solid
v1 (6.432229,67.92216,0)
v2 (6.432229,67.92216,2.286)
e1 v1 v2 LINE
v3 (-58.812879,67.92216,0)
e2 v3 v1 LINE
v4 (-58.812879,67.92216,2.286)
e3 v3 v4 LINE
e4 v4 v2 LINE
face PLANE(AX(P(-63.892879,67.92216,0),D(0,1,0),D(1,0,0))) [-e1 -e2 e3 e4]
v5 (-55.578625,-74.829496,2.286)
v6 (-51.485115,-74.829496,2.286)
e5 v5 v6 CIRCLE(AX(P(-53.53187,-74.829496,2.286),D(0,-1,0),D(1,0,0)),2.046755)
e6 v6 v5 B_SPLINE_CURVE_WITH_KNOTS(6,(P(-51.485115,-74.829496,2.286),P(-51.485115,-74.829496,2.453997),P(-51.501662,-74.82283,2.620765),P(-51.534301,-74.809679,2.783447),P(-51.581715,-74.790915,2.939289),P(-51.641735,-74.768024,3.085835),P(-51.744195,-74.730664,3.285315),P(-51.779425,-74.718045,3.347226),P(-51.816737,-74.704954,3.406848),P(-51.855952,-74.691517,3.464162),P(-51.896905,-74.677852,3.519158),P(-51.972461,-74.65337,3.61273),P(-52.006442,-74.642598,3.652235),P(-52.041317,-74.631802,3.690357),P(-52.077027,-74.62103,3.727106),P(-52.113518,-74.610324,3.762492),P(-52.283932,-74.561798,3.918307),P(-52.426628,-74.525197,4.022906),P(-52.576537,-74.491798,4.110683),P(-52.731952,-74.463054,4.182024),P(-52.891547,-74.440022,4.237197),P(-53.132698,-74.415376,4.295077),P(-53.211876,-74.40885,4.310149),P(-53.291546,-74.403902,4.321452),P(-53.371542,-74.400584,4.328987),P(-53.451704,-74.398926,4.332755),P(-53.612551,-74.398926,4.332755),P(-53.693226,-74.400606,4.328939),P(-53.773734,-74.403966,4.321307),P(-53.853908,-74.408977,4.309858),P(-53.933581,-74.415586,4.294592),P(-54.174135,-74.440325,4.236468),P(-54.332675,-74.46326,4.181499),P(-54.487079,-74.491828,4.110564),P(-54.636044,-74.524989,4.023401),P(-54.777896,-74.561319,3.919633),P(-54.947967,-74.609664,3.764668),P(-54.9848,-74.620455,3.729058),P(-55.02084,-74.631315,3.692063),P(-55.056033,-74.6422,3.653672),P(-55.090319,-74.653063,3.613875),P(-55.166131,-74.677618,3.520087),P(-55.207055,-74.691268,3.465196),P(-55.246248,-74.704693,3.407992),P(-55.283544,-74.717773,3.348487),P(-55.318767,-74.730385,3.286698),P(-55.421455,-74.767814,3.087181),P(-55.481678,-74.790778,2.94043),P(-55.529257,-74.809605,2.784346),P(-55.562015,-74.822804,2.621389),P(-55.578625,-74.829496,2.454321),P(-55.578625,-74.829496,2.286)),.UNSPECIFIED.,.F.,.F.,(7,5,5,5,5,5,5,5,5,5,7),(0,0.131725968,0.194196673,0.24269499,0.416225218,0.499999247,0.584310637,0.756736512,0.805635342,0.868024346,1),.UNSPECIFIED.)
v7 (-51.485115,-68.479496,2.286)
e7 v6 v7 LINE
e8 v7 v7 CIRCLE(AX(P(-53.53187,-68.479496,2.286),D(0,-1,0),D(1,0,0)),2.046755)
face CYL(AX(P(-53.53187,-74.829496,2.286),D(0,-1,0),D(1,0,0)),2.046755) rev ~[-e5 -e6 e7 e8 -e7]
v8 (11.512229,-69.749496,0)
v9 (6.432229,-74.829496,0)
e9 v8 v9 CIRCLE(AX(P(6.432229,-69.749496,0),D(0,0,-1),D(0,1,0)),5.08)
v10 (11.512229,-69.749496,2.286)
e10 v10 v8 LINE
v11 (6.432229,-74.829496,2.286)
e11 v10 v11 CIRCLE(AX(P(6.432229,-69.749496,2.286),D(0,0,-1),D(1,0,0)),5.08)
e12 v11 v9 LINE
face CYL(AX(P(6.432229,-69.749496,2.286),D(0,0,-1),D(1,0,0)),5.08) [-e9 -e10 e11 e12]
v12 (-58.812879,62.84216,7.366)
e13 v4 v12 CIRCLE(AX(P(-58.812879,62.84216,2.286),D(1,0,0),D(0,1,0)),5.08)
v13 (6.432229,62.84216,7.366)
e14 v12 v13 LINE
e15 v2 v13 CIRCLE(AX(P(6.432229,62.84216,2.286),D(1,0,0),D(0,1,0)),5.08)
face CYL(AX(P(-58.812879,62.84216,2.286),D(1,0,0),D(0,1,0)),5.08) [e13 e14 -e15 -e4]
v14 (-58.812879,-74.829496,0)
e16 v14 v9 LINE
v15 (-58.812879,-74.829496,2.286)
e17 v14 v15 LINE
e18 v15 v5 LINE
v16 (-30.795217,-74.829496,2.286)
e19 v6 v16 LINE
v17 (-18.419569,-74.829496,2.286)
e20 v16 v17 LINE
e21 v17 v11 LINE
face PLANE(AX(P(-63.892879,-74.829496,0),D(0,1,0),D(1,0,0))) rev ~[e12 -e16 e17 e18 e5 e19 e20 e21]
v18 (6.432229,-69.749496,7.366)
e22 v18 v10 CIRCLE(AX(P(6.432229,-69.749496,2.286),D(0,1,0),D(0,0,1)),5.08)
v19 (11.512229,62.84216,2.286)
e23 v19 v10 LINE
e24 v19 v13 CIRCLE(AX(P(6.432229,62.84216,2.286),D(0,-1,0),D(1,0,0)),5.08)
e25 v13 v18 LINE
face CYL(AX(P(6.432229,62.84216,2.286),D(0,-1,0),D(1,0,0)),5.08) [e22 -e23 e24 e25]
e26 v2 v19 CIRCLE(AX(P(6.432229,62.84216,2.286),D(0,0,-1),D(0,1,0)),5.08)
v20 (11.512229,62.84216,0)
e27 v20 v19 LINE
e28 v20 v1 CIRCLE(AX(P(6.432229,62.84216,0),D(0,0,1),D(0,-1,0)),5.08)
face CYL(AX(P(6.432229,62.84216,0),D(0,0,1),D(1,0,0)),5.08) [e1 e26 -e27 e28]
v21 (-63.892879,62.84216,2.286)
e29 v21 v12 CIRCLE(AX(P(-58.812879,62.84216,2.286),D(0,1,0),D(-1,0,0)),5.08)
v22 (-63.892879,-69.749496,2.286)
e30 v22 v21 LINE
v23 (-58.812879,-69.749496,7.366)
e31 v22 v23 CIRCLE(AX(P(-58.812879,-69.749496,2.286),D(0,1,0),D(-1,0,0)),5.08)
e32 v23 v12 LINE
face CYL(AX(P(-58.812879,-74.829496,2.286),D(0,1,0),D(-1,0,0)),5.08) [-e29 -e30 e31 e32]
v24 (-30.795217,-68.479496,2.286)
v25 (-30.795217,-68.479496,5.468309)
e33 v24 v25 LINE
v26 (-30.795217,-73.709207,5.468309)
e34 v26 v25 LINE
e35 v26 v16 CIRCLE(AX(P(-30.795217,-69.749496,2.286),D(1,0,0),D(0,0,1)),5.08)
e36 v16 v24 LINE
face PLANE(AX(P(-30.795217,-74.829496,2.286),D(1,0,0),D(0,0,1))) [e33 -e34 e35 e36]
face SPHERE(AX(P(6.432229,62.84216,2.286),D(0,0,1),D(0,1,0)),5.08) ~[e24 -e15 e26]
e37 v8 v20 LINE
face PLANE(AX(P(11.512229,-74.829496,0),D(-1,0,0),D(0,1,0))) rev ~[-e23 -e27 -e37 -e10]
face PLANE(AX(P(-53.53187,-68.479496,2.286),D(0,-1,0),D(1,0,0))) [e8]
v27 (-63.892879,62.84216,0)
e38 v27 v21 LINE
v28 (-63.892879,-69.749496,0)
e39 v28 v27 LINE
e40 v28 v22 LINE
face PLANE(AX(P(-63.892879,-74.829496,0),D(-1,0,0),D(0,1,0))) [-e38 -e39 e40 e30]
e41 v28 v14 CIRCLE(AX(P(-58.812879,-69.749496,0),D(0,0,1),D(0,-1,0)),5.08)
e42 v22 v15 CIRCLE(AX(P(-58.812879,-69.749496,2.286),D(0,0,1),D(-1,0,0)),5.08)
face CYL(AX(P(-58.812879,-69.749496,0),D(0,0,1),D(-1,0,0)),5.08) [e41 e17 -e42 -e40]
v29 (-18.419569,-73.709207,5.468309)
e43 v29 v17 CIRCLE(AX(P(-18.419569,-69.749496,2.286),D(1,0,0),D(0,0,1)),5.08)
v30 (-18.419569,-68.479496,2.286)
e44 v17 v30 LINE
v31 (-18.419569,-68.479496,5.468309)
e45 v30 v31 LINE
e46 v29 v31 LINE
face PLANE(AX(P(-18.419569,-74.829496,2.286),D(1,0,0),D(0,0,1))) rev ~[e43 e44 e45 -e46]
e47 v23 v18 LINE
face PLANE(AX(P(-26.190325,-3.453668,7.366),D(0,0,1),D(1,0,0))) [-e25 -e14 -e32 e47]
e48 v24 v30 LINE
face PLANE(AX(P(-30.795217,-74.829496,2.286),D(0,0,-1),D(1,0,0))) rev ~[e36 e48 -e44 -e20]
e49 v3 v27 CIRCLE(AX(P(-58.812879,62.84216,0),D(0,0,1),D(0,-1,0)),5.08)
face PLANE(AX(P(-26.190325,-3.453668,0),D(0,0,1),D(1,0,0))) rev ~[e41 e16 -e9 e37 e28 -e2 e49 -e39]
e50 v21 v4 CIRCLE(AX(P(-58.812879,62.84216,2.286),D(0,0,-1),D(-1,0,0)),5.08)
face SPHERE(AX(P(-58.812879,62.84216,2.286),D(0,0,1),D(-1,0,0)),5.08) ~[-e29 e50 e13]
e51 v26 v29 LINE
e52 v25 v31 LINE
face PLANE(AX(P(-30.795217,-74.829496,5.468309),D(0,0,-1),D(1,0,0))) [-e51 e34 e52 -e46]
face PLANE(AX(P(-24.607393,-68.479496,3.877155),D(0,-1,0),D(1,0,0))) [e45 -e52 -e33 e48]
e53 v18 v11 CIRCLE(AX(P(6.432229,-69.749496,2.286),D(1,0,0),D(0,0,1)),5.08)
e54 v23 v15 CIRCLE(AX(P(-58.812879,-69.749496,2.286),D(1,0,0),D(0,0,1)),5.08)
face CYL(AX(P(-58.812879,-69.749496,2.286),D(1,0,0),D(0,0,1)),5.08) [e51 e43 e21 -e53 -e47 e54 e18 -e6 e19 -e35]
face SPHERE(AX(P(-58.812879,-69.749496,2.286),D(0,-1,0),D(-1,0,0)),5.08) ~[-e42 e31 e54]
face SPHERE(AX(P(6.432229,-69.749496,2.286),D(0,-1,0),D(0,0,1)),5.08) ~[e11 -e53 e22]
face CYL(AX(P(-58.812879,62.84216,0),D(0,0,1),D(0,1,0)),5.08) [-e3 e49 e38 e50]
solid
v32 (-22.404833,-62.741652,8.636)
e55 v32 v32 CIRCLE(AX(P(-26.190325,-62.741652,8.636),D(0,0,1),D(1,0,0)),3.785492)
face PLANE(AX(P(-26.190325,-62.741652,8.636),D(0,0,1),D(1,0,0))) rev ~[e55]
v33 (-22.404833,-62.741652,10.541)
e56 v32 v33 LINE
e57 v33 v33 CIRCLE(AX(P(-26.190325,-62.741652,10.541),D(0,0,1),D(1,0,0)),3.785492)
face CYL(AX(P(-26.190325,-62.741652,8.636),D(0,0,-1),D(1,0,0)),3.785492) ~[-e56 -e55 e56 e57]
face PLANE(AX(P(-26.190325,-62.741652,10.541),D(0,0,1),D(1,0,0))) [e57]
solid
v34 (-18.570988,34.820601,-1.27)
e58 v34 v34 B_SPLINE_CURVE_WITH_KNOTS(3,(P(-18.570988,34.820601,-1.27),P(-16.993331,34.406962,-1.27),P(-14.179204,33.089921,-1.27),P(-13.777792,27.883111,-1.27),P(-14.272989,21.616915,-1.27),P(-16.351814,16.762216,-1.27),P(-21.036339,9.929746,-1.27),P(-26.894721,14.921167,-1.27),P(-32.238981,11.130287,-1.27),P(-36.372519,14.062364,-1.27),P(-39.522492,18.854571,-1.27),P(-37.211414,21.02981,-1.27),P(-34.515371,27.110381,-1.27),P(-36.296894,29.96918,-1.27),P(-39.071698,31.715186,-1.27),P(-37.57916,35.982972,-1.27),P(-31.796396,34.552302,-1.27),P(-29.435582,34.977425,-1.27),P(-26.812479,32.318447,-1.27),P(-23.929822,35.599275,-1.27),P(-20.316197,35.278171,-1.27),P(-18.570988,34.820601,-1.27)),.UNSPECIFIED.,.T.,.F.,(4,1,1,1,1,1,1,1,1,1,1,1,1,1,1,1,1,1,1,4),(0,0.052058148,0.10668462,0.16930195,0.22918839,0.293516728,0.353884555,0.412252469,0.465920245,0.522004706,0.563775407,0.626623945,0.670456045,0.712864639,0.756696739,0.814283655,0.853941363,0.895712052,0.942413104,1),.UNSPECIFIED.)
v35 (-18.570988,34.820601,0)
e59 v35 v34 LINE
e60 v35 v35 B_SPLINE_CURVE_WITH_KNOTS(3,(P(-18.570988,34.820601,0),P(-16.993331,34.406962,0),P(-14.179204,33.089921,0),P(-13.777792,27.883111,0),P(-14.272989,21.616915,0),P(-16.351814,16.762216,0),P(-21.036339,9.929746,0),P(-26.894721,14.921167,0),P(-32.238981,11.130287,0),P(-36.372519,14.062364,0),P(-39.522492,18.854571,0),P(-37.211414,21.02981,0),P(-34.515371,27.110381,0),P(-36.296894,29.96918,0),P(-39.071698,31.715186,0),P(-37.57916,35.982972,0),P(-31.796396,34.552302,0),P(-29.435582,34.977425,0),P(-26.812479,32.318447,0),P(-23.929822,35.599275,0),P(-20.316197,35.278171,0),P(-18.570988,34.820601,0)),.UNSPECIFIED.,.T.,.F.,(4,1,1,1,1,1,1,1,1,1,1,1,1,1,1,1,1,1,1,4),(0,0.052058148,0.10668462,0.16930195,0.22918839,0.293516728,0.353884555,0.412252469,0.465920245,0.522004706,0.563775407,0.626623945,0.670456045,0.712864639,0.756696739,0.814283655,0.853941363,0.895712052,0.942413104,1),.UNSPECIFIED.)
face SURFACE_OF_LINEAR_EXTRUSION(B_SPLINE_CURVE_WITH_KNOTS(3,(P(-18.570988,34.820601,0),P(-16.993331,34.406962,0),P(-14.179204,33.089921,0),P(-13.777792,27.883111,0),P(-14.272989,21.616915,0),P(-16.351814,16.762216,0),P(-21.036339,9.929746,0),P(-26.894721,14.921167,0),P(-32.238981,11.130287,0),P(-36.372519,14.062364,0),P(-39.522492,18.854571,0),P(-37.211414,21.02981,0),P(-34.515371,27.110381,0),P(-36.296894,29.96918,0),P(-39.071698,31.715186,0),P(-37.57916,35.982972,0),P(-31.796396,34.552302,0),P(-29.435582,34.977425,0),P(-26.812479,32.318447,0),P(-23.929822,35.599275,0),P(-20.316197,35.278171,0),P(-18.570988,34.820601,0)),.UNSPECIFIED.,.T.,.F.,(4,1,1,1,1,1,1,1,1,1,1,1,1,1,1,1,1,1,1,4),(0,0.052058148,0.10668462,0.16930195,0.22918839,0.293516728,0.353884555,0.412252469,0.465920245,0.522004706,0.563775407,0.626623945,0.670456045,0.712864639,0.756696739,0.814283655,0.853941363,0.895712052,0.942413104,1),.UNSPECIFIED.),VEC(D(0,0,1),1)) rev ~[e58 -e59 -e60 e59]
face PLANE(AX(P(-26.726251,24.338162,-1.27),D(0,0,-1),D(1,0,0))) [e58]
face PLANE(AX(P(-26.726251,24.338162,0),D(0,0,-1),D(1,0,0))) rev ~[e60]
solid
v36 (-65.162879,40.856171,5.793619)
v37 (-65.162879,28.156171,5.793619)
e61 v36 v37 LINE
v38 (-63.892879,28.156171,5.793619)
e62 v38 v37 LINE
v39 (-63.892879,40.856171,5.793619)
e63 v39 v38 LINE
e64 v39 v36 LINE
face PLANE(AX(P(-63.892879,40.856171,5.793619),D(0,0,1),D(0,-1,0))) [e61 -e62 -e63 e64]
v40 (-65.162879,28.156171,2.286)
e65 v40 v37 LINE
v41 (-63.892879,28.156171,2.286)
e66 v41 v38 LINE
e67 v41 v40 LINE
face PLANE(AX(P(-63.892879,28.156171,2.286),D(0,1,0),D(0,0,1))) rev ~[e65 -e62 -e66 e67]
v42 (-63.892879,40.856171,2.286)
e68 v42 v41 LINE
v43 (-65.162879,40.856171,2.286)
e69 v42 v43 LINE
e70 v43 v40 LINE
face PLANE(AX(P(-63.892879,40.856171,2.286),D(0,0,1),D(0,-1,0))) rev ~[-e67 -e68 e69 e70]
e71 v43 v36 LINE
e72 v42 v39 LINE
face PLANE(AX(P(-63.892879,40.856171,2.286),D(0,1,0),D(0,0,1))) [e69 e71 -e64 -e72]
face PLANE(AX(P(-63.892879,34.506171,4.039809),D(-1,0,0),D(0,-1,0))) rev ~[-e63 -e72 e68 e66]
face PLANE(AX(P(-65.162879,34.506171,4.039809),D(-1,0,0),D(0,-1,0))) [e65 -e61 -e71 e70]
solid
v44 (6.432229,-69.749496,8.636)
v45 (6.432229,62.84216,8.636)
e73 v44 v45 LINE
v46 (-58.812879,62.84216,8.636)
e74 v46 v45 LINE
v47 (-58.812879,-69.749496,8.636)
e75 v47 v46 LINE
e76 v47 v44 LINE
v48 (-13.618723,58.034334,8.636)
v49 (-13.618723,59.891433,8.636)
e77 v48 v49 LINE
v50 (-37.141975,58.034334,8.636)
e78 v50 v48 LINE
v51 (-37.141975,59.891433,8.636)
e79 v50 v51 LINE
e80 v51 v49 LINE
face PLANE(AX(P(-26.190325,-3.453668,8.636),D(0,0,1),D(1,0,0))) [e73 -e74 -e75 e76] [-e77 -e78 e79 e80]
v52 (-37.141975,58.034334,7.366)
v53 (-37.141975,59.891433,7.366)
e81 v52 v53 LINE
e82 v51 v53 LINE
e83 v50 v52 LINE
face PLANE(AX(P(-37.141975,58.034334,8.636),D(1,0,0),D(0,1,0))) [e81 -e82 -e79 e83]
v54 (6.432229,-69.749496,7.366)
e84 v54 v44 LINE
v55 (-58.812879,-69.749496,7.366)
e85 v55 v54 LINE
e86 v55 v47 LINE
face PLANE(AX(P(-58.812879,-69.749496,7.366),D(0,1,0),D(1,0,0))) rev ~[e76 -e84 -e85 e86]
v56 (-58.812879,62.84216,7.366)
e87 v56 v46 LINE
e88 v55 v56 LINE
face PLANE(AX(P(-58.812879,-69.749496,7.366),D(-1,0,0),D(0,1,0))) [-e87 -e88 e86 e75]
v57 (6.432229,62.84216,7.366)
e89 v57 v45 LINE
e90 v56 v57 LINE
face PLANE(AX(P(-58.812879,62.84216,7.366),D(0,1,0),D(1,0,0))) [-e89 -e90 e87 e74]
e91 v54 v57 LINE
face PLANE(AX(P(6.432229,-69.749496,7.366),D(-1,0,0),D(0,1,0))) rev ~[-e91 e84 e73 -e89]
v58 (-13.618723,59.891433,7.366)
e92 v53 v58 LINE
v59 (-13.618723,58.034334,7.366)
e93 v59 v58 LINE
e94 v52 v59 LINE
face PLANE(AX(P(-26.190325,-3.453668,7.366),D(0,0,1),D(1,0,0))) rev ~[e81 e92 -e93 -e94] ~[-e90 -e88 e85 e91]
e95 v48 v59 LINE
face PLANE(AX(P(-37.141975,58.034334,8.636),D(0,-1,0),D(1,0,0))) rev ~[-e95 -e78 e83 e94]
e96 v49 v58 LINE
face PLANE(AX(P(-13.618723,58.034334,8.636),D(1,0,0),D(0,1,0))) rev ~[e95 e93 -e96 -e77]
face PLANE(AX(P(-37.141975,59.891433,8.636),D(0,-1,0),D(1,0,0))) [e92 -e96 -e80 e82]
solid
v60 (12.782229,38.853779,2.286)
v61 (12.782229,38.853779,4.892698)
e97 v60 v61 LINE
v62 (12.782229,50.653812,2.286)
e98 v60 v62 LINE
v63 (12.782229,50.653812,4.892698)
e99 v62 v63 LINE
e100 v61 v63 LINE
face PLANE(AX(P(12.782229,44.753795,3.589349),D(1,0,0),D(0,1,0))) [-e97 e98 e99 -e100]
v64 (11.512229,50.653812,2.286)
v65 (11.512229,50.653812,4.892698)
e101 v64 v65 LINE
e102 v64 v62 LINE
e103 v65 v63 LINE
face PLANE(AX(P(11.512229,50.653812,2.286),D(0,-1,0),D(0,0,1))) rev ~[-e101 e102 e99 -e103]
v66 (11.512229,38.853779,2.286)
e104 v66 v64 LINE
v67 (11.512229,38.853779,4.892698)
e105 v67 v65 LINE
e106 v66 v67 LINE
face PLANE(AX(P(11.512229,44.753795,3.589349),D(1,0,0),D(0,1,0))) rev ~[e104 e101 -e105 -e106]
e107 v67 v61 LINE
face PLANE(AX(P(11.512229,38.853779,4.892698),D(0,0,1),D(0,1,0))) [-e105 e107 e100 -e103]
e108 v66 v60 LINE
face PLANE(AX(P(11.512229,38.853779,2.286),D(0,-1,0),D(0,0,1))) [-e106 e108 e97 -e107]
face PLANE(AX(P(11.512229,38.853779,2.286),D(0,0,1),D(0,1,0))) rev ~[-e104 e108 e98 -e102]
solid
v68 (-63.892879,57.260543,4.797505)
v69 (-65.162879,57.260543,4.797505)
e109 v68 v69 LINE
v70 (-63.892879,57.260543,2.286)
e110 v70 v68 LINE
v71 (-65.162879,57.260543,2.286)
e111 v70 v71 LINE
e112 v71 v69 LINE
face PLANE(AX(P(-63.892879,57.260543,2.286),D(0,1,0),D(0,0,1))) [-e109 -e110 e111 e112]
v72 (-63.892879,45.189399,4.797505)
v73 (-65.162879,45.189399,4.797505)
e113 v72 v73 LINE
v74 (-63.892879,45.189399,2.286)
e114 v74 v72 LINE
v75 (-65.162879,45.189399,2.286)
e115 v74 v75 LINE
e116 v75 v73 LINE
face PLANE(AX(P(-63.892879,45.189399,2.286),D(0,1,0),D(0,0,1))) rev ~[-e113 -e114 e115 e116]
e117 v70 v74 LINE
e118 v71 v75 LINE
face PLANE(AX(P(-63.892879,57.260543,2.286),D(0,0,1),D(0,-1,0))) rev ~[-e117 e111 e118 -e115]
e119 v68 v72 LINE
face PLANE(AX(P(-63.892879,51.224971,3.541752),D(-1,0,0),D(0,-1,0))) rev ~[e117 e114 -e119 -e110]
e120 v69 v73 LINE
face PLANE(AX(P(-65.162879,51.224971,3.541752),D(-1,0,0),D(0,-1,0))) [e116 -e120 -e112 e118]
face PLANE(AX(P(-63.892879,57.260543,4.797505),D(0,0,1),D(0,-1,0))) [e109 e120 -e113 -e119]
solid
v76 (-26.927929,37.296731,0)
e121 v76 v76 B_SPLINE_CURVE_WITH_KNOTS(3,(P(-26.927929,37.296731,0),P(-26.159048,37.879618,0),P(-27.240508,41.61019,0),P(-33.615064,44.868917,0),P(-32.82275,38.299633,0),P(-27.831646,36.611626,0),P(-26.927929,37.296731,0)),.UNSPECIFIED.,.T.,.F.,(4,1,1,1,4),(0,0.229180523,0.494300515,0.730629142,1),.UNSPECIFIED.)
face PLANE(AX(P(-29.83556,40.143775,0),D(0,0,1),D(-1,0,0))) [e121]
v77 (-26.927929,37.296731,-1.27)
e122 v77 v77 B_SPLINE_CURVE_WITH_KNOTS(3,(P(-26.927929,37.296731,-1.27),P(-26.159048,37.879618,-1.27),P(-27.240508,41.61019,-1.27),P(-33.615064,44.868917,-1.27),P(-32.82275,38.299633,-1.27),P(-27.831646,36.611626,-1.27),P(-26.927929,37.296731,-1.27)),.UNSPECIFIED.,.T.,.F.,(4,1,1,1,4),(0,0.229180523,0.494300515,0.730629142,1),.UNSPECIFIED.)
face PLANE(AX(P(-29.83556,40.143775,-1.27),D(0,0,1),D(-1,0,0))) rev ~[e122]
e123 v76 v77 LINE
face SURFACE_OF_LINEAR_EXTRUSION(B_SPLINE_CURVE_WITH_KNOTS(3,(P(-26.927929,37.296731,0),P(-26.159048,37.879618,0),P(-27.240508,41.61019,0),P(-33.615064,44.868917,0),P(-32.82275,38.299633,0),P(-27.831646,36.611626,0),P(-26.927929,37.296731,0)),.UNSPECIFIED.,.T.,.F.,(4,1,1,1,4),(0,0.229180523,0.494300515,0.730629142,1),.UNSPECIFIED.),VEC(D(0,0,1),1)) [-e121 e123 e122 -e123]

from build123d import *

# Parameters (mm, degrees)
F0_W      = 75.4051078111
F0_H      = 142.7516564727
F1_DEPTH  = 7.366
F2_F1_R   = 5.08
F2_F2_R   = 5.08
F2_F3_R   = 5.08
F2_F4_R   = 5.08
F3_W      = 12.3756472021
F3_H      = 3.1823093913
F4_DEPTH  = 6.35
F5_R      = 2.046755254
F6_DEPTH  = 6.35
F7_W      = 65.2451078111
F7_H      = 132.5916564727
F8_DEPTH  = 1.27
F9_W      = 11.800032109
F9_H      = 2.6066980235
F10_DEPTH = 1.27
F11_R     = 3.7854916829
F12_DEPTH = 1.905
F13_W     = 23.5232524574
F13_H     = 1.857098192
F14_DEPTH = 6.35
F15_W     = 12.0711438358
F15_H     = 2.5115047491
F16_DEPTH = 1.27
F17_W     = 12.7
F17_H     = 3.5076188103
F18_DEPTH = 1.27
F20_DEPTH = 1.27


with BuildPart() as f1:
    # F0 (on Top) → F1 (new body)
    with BuildSketch(Plane.XY):
        with Locations((-26.1903246865, -3.4536682069)):
            Rectangle(F0_W, F0_H)
    extrude(amount=F1_DEPTH)

    # F2: fillet of radius 5.08 on 8 edges, made by hand

    # F2_f1
    f2_f1_edges = [f1.edges().sort_by_distance(p)[0] for p in [
        (11.5122292191, 67.9221600294, 3.683),
    ]]
    fillet(f2_f1_edges, radius=F2_F1_R)

    # F2_f2
    f2_f2_edges = [f1.edges().sort_by_distance(p)[0] for p in [
        (-63.892878592, 67.9221600294, 3.683),
    ]]
    fillet(f2_f2_edges, radius=F2_F2_R)

    # F2_f3
    f2_f3_edges = [f1.edges().sort_by_distance(p)[0] for p in [
        (-26.1903246865, 67.9221600294, 7.366),
    ]]
    fillet(f2_f3_edges, radius=F2_F3_R)

    # F2_f4
    f2_f4_edges = [f1.edges().sort_by_distance(p)[0] for p in [
        (-63.892878592, -74.8294964433, 1.143),
    ]]
    fillet(f2_f4_edges, radius=F2_F4_R)

    # F3 (on face) → F4 (cut)
    with BuildSketch(Plane.XZ.offset(74.8294964433)):
        with Locations((-24.6073929593, 3.8771546956)):
            Rectangle(F3_W, F3_H)
    extrude(amount=-F4_DEPTH, mode=Mode.SUBTRACT)

    # F5 (on face) → F6 (cut)
    with BuildSketch(Plane.XZ.offset(74.8294964433)):
        with Locations((-53.5318702459, 2.286)):
            Circle(F5_R)
    extrude(amount=-F6_DEPTH, mode=Mode.SUBTRACT)


with BuildPart() as f8:
    # F7 (on face) → F8 (new body)
    with BuildSketch(Plane.XY.offset(7.366)):
        with Locations((-26.1903246865, -3.4536682069)):
            Rectangle(F7_W, F7_H)
    extrude(amount=F8_DEPTH)

    # F13 (on face) → F14 (cut)
    with BuildSketch(Plane.XY.offset(8.636)):
        with Locations((-25.3803487867, 58.9628834277)):
            Rectangle(F13_W, F13_H)
    extrude(amount=-F14_DEPTH, mode=Mode.SUBTRACT)


with BuildPart() as f10:
    # F9 (on face) → F10 (new body)
    with BuildSketch(Plane.YZ.offset(11.5122292191)):
        with Locations((44.7537954897, 3.5893490117)):
            Rectangle(F9_W, F9_H)
    extrude(amount=F10_DEPTH)


with BuildPart() as f12:
    # F11 (on face) → F12 (new body)
    with BuildSketch(Plane.XY.offset(8.636)):
        with Locations((-26.1903246865, -62.7416521311)):
            Circle(F11_R)
    extrude(amount=F12_DEPTH)


with BuildPart() as f16:
    # F15 (on face) → F16 (new body)
    with BuildSketch(Plane(origin=(-63.892878592, 0, 0), x_dir=(0, -1, 0), z_dir=(-1, 0, 0))):
        with Locations((-51.2249711901, 3.5417523746)):
            Rectangle(F15_W, F15_H)
    extrude(amount=F16_DEPTH)


with BuildPart() as f18:
    # F17 (on face) → F18 (new body)
    with BuildSketch(Plane(origin=(-63.892878592, 0, 0), x_dir=(0, -1, 0), z_dir=(-1, 0, 0))):
        with Locations((-34.5061713994, 4.0398094052)):
            Rectangle(F17_W, F17_H)
    extrude(amount=F18_DEPTH)


with BuildPart() as f20:
    # F19 (on face) → F20 (new body)
    with BuildSketch(Plane(origin=(0, 0, 0), x_dir=(1, 0, 0), z_dir=(0, 0, -1))):
        with BuildLine():
            add(Edge.make_bspline(
                [(-26.9279293716, -37.296731025), (-26.1590478095, -37.8796180067), (-27.2405076799, -41.610190349), (-33.6150642057, -44.8689171286), (-32.8227501646, -38.2996334195), (-27.8316461583, -36.6116258331), (-26.9279293716, -37.296731025)],
                knots=[0, 0, 0, 0, 0.2291805231, 0.4943005153, 0.7306291422, 1, 1, 1, 1], degree=3))
        make_face()
    extrude(amount=F20_DEPTH)


with BuildPart() as f20b:
    # F19 (on face) → F20, piece 2 (new body)
    with BuildSketch(Plane(origin=(0, 0, 0), x_dir=(1, 0, 0), z_dir=(0, 0, -1))):
        with BuildLine():
            add(Edge.make_bspline(
                [(-18.5709875077, -34.8206013441), (-16.9933307569, -34.4069620178), (-14.1792039609, -33.0899210778), (-13.7777924329, -27.883110785), (-14.272988719, -21.6169154673), (-16.351813669, -16.762216435), (-21.0363385209, -9.9297464764), (-26.8947206756, -14.9211673759), (-32.2389811264, -11.130286541), (-36.3725185757, -14.0623640639), (-39.5224923345, -18.8545713408), (-37.2114139136, -21.0298104682), (-34.5153706863, -27.1103805858), (-36.2968935413, -29.969179565), (-39.0716980584, -31.7151857926), (-37.5791604466, -35.9829722305), (-31.7963960221, -34.5523022934), (-29.4355823464, -34.9774247098), (-26.8124785552, -32.318446701), (-23.9298221224, -35.599274808), (-20.3161966458, -35.2781705408), (-18.5709875077, -34.8206013441)],
                knots=[0, 0, 0, 0, 0.0520581477, 0.10668462, 0.1693019503, 0.2291883895, 0.2935167278, 0.3538845551, 0.4122524688, 0.4659202448, 0.522004706, 0.5637754073, 0.6266239453, 0.6704560449, 0.7128646393, 0.7566967388, 0.814283655, 0.8539413629, 0.8957120516, 0.9424131041, 1, 1, 1, 1], degree=3))
        make_face()
    extrude(amount=F20_DEPTH)


solid = Compound([f1.part, f8.part, f10.part, f12.part, f16.part, f18.part, f20.part, f20b.part])
